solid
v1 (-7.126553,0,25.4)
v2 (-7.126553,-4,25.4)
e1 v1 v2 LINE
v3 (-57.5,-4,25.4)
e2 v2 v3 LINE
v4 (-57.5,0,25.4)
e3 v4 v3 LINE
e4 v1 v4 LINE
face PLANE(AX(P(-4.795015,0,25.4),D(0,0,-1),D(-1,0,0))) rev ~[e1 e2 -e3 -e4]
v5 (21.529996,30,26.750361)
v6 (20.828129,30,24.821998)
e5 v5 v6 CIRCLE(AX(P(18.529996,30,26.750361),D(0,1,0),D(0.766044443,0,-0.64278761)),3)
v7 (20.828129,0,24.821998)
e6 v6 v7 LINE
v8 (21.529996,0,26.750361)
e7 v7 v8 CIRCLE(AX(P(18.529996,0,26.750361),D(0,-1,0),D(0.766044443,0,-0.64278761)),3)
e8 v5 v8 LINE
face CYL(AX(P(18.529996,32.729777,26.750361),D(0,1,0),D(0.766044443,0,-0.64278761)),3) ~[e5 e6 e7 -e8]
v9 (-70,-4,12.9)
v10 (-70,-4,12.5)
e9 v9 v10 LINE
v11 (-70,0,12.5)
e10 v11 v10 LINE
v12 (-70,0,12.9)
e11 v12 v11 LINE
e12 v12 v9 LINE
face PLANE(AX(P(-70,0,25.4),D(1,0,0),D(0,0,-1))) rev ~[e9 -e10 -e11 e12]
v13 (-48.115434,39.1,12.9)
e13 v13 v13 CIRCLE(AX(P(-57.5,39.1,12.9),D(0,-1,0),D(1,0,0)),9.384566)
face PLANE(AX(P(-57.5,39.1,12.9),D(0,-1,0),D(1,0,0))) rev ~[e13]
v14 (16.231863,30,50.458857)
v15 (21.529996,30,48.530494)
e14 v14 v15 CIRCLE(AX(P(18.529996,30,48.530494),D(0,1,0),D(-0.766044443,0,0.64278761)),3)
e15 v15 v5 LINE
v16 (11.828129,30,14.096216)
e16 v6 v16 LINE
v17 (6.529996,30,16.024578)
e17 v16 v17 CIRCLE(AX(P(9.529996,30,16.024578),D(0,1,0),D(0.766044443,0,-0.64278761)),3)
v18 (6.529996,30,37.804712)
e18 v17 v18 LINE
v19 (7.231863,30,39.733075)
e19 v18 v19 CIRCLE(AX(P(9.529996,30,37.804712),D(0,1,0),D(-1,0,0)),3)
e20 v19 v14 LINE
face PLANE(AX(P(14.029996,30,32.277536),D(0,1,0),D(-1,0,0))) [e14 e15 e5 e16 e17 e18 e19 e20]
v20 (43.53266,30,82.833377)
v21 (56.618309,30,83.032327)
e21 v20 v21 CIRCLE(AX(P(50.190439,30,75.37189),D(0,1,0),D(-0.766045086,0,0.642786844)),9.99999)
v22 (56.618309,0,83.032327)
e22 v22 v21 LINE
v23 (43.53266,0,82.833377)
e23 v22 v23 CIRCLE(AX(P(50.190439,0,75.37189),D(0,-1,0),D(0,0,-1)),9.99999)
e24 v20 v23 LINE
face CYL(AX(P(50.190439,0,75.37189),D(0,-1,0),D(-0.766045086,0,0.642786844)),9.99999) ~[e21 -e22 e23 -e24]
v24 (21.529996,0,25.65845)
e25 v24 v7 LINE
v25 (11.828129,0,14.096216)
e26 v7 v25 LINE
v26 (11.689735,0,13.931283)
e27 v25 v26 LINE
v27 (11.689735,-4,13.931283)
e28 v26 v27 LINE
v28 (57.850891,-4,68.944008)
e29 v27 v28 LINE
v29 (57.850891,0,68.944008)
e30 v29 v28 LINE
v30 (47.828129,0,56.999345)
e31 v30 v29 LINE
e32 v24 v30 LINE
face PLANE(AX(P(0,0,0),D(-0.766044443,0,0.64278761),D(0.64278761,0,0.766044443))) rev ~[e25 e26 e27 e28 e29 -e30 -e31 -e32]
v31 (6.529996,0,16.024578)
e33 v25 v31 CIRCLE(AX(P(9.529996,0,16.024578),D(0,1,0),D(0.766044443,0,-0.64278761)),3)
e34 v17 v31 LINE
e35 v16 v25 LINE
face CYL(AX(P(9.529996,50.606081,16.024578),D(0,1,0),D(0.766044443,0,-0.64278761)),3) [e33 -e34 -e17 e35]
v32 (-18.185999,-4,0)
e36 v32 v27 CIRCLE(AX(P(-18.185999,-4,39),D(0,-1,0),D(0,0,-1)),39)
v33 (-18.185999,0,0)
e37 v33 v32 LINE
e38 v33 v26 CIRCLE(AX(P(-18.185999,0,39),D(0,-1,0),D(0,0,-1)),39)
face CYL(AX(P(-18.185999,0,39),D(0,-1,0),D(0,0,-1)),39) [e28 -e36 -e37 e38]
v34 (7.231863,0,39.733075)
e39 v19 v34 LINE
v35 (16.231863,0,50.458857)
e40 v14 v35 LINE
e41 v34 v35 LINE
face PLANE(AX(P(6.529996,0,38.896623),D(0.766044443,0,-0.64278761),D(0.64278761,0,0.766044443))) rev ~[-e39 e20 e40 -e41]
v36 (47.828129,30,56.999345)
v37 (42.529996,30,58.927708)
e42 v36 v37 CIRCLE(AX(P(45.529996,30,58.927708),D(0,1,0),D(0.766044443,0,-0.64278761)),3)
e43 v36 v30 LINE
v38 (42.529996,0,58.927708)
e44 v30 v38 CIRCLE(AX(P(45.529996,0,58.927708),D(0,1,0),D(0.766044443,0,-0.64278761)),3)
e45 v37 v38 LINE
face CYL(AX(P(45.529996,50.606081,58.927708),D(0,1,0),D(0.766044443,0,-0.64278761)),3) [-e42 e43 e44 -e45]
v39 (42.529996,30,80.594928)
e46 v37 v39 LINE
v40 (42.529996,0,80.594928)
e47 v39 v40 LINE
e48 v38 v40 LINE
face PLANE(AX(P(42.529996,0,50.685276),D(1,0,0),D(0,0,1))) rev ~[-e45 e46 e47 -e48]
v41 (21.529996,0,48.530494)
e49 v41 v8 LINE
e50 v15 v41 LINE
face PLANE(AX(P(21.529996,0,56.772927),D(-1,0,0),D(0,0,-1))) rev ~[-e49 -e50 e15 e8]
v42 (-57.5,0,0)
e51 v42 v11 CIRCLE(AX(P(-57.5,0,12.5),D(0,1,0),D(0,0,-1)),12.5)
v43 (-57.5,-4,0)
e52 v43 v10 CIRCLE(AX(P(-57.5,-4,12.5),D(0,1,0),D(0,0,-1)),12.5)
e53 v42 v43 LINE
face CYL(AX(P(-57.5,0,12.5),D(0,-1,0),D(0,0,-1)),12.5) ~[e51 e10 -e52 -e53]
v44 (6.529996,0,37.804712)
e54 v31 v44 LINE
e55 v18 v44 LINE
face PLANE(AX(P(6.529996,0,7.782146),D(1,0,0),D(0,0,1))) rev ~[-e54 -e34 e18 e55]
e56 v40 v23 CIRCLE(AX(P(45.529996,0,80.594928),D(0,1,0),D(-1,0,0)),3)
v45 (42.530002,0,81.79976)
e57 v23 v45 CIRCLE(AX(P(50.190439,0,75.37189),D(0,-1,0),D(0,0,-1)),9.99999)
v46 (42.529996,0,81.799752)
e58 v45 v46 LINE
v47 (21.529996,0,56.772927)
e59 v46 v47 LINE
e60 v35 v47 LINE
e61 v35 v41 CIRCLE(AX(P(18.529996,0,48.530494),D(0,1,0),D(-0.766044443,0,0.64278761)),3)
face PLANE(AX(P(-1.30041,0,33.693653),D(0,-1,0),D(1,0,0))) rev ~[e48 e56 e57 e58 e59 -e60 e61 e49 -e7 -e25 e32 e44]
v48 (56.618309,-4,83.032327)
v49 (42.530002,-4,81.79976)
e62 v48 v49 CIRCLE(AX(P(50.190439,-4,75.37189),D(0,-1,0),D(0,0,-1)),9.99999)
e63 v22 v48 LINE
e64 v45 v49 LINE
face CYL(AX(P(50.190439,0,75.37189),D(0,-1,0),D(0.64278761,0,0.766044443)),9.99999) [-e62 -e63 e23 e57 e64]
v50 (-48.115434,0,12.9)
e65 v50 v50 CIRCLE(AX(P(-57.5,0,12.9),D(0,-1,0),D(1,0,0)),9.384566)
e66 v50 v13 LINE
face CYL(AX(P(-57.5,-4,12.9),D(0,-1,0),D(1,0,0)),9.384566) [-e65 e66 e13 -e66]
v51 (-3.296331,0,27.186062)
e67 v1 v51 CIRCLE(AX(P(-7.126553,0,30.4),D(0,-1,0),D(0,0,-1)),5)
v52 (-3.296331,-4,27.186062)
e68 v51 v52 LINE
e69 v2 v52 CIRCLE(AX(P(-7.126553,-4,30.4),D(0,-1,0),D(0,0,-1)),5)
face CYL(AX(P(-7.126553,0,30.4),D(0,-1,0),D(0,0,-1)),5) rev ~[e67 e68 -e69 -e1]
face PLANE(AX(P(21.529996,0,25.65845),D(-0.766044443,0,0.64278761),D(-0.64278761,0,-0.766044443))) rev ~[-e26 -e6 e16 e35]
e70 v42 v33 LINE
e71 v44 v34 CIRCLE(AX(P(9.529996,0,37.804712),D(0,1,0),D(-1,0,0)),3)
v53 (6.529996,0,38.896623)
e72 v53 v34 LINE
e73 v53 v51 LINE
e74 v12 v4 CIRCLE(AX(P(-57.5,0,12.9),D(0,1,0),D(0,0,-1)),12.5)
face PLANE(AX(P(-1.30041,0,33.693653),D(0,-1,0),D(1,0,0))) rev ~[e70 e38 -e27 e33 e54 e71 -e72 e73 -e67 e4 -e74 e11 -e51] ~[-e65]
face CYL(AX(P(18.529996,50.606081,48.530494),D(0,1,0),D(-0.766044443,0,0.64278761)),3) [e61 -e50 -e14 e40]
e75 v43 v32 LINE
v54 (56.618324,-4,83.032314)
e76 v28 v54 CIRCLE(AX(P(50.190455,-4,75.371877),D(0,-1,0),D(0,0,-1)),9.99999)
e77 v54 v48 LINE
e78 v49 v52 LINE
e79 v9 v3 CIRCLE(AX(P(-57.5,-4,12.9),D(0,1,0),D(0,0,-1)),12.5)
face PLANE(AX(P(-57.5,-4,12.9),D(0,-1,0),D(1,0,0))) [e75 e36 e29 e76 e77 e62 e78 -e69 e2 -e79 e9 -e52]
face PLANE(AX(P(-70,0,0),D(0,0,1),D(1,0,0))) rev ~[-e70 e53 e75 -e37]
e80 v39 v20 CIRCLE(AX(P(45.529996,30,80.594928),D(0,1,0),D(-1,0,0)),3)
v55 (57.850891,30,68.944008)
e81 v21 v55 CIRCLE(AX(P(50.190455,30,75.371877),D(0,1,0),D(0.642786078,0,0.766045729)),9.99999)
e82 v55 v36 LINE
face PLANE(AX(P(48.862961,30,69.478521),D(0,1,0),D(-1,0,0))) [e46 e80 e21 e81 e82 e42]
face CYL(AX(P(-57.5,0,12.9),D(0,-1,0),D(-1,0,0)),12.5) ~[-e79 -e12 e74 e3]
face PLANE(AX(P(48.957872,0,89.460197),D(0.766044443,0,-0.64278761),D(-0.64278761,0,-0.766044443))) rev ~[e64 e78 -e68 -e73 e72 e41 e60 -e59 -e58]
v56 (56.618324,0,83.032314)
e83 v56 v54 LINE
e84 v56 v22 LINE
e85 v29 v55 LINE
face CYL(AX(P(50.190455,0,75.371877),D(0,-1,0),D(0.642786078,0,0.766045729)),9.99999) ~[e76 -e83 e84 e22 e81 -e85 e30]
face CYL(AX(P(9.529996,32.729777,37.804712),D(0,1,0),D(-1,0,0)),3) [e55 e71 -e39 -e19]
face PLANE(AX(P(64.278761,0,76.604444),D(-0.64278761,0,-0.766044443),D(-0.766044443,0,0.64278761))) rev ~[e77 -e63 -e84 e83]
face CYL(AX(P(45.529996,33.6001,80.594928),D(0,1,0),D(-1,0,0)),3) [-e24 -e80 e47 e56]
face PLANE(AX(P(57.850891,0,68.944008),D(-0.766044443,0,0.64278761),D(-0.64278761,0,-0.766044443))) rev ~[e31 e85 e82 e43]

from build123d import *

# Parameters (mm, degrees)
F1_DEPTH    = 4
F2_R        = 9.99999
F3_R        = 12.5
F6_DEPTH    = 30
F4_R        = 9.3845657054
F7_DEPTH    = 43.1
F8_T1_DEPTH = 50.6060806459
F8_T3_DEPTH = 32.729776757
F8_T5_DEPTH = 33.6001001543
F9_R        = 39
F10_R       = 5


# Not quite as in the source:
# - a fillet or chamfer that OpenCascade refuses, or shapes differently, is made with other operations: its cross-section is extruded or revolved along the edge and cut away or added
# - a fillet or chamfer is up to 0.001 mm smaller than in the source, because OpenCascade refuses the exact size
# - ends of sketch curves that miss each other by under 0.0002 mm in the source are joined


with BuildPart() as f1:
    # F0 (on Front) → F1 (new body)
    with BuildSketch(Plane.XZ):
        Polygon((-70, 0), (0, 0), (64.2787609687, 76.6044443119), (48.9578721063, 89.4601965056), (-4.7950151547, 25.4), (-70, 25.4), align=None)
    extrude(amount=F1_DEPTH)

    # F2 (radius 10 in the source; OpenCascade refuses exactly that, so slightly less here)
    f2_edges = [f1.edges().sort_by_distance(p)[0] for p in [
        (64.278761, -2, 76.604444),
        (48.957872, -2, 89.460197),
    ]]
    fillet(f2_edges, radius=F2_R)

    # F3
    f3_edges = [f1.edges().sort_by_distance(p)[0] for p in [
        (-70, -2, 0),
        (-70, -2, 25.4),
    ]]
    fillet(f3_edges, radius=F3_R)

    # F5 (on face) → F6 (join)
    with BuildSketch(Plane(origin=(0, 0, 0), x_dir=(-1, 0, 0), z_dir=(0, 1, 0))):
        with BuildLine():
            Line((-42.5299960094, 50.6852755372), (-42.5299960094, 81.7997520744))
            ThreePointArc((-42.5299960094, 81.7997520744), (-49.3188826521, 85.3338270849), (-56.618308877, 83.0323268366))
            ThreePointArc((-56.618308877, 83.0323268366), (-60.1523915479, 76.2434337661), (-57.8508912997, 68.9440075412))
            Line((-57.8508912997, 68.9440075412), (-42.5299960094, 50.6852755372))
        make_face()
        Polygon((-6.5299960094, 38.896622741), (-21.5299960094, 56.77292663), (-21.5299960094, 25.6584500928), (-6.5299960094, 7.7821462038), align=None)
    extrude(amount=F6_DEPTH)

    # F4 (on face) → F7 (join)
    with BuildSketch(Plane.XZ.offset(4)):
        with Locations((-57.5, 12.9)):
            Circle(F4_R)
    extrude(amount=-F7_DEPTH)

    # F8: fillet of radius 3 on 6 edges, made by hand

    # F8_s2 → F8_t1 (cut)
    with BuildSketch(Plane.XZ.offset(-50.6060806459)):
        with BuildLine():
            ThreePointArc((16.2318626801, 50.4588572007), (19.5560564394, 51.349572234), (21.5299960094, 48.5304943716))
            Line((21.5299960094, 48.5304943716), (21.5299960094, 56.77292663))
            Line((21.5299960094, 56.77292663), (16.2318626801, 50.4588572007))
        make_face()
        with BuildLine():
            ThreePointArc((11.8281293388, 14.0962156331), (8.5039355794, 13.2055005998), (6.5299960094, 16.0245784622))
            Line((6.5299960094, 16.0245784622), (6.5299960094, 7.7821462038))
            Line((6.5299960094, 7.7821462038), (11.8281293388, 14.0962156331))
        make_face()
        with BuildLine():
            ThreePointArc((47.8281293388, 56.9993449665), (44.5039355794, 56.1086299332), (42.5299960094, 58.9277077956))
            Line((42.5299960094, 58.9277077956), (42.5299960094, 50.6852755372))
            Line((42.5299960094, 50.6852755372), (47.8281293388, 56.9993449665))
        make_face()
    extrude(amount=F8_T1_DEPTH, mode=Mode.SUBTRACT)

    # F8_s4 → F8_t3 (cut)
    with BuildSketch(Plane.XZ.offset(-32.729776757)):
        with BuildLine():
            ThreePointArc((20.8281293388, 24.8219979665), (21.3490738718, 25.7243003656), (21.5299960094, 26.7503607956))
            Line((21.5299960094, 26.7503607956), (21.5299960094, 25.6584500928))
            Line((21.5299960094, 25.6584500928), (20.8281293388, 24.8219979665))
        make_face()
        with BuildLine():
            ThreePointArc((6.5299960094, 37.8047120382), (6.7109181471, 38.8307724682), (7.2318626801, 39.7330748673))
            Line((7.2318626801, 39.7330748673), (6.5299960094, 38.896622741))
            Line((6.5299960094, 38.896622741), (6.5299960094, 37.8047120382))
        make_face()
    extrude(amount=F8_T3_DEPTH, mode=Mode.SUBTRACT)

    # F8_s6 → F8_t5 (cut)
    with BuildSketch(Plane.XZ.offset(-33.6001001543)):
        with BuildLine():
            ThreePointArc((42.5299960094, 80.5949283764), (42.7921129807, 81.8213037352), (43.5326603567, 82.8333765643))
            ThreePointArc((43.5326603567, 82.8333765643), (43.0126982288, 82.3346362508), (42.5299960094, 81.7997520744))
            Line((42.5299960094, 81.7997520744), (42.5299960094, 80.5949283764))
        make_face()
    extrude(amount=F8_T5_DEPTH, mode=Mode.SUBTRACT)

    # F9
    f9_edges = [f1.edges().sort_by_distance(p)[0] for p in [
        (0, -2, 0),
    ]]
    fillet(f9_edges, radius=F9_R)

    # F10
    f10_edges = [f1.edges().sort_by_distance(p)[0] for p in [
        (-4.795015, -2, 25.4),
    ]]
    fillet(f10_edges, radius=F10_R)


solid = f1.part
